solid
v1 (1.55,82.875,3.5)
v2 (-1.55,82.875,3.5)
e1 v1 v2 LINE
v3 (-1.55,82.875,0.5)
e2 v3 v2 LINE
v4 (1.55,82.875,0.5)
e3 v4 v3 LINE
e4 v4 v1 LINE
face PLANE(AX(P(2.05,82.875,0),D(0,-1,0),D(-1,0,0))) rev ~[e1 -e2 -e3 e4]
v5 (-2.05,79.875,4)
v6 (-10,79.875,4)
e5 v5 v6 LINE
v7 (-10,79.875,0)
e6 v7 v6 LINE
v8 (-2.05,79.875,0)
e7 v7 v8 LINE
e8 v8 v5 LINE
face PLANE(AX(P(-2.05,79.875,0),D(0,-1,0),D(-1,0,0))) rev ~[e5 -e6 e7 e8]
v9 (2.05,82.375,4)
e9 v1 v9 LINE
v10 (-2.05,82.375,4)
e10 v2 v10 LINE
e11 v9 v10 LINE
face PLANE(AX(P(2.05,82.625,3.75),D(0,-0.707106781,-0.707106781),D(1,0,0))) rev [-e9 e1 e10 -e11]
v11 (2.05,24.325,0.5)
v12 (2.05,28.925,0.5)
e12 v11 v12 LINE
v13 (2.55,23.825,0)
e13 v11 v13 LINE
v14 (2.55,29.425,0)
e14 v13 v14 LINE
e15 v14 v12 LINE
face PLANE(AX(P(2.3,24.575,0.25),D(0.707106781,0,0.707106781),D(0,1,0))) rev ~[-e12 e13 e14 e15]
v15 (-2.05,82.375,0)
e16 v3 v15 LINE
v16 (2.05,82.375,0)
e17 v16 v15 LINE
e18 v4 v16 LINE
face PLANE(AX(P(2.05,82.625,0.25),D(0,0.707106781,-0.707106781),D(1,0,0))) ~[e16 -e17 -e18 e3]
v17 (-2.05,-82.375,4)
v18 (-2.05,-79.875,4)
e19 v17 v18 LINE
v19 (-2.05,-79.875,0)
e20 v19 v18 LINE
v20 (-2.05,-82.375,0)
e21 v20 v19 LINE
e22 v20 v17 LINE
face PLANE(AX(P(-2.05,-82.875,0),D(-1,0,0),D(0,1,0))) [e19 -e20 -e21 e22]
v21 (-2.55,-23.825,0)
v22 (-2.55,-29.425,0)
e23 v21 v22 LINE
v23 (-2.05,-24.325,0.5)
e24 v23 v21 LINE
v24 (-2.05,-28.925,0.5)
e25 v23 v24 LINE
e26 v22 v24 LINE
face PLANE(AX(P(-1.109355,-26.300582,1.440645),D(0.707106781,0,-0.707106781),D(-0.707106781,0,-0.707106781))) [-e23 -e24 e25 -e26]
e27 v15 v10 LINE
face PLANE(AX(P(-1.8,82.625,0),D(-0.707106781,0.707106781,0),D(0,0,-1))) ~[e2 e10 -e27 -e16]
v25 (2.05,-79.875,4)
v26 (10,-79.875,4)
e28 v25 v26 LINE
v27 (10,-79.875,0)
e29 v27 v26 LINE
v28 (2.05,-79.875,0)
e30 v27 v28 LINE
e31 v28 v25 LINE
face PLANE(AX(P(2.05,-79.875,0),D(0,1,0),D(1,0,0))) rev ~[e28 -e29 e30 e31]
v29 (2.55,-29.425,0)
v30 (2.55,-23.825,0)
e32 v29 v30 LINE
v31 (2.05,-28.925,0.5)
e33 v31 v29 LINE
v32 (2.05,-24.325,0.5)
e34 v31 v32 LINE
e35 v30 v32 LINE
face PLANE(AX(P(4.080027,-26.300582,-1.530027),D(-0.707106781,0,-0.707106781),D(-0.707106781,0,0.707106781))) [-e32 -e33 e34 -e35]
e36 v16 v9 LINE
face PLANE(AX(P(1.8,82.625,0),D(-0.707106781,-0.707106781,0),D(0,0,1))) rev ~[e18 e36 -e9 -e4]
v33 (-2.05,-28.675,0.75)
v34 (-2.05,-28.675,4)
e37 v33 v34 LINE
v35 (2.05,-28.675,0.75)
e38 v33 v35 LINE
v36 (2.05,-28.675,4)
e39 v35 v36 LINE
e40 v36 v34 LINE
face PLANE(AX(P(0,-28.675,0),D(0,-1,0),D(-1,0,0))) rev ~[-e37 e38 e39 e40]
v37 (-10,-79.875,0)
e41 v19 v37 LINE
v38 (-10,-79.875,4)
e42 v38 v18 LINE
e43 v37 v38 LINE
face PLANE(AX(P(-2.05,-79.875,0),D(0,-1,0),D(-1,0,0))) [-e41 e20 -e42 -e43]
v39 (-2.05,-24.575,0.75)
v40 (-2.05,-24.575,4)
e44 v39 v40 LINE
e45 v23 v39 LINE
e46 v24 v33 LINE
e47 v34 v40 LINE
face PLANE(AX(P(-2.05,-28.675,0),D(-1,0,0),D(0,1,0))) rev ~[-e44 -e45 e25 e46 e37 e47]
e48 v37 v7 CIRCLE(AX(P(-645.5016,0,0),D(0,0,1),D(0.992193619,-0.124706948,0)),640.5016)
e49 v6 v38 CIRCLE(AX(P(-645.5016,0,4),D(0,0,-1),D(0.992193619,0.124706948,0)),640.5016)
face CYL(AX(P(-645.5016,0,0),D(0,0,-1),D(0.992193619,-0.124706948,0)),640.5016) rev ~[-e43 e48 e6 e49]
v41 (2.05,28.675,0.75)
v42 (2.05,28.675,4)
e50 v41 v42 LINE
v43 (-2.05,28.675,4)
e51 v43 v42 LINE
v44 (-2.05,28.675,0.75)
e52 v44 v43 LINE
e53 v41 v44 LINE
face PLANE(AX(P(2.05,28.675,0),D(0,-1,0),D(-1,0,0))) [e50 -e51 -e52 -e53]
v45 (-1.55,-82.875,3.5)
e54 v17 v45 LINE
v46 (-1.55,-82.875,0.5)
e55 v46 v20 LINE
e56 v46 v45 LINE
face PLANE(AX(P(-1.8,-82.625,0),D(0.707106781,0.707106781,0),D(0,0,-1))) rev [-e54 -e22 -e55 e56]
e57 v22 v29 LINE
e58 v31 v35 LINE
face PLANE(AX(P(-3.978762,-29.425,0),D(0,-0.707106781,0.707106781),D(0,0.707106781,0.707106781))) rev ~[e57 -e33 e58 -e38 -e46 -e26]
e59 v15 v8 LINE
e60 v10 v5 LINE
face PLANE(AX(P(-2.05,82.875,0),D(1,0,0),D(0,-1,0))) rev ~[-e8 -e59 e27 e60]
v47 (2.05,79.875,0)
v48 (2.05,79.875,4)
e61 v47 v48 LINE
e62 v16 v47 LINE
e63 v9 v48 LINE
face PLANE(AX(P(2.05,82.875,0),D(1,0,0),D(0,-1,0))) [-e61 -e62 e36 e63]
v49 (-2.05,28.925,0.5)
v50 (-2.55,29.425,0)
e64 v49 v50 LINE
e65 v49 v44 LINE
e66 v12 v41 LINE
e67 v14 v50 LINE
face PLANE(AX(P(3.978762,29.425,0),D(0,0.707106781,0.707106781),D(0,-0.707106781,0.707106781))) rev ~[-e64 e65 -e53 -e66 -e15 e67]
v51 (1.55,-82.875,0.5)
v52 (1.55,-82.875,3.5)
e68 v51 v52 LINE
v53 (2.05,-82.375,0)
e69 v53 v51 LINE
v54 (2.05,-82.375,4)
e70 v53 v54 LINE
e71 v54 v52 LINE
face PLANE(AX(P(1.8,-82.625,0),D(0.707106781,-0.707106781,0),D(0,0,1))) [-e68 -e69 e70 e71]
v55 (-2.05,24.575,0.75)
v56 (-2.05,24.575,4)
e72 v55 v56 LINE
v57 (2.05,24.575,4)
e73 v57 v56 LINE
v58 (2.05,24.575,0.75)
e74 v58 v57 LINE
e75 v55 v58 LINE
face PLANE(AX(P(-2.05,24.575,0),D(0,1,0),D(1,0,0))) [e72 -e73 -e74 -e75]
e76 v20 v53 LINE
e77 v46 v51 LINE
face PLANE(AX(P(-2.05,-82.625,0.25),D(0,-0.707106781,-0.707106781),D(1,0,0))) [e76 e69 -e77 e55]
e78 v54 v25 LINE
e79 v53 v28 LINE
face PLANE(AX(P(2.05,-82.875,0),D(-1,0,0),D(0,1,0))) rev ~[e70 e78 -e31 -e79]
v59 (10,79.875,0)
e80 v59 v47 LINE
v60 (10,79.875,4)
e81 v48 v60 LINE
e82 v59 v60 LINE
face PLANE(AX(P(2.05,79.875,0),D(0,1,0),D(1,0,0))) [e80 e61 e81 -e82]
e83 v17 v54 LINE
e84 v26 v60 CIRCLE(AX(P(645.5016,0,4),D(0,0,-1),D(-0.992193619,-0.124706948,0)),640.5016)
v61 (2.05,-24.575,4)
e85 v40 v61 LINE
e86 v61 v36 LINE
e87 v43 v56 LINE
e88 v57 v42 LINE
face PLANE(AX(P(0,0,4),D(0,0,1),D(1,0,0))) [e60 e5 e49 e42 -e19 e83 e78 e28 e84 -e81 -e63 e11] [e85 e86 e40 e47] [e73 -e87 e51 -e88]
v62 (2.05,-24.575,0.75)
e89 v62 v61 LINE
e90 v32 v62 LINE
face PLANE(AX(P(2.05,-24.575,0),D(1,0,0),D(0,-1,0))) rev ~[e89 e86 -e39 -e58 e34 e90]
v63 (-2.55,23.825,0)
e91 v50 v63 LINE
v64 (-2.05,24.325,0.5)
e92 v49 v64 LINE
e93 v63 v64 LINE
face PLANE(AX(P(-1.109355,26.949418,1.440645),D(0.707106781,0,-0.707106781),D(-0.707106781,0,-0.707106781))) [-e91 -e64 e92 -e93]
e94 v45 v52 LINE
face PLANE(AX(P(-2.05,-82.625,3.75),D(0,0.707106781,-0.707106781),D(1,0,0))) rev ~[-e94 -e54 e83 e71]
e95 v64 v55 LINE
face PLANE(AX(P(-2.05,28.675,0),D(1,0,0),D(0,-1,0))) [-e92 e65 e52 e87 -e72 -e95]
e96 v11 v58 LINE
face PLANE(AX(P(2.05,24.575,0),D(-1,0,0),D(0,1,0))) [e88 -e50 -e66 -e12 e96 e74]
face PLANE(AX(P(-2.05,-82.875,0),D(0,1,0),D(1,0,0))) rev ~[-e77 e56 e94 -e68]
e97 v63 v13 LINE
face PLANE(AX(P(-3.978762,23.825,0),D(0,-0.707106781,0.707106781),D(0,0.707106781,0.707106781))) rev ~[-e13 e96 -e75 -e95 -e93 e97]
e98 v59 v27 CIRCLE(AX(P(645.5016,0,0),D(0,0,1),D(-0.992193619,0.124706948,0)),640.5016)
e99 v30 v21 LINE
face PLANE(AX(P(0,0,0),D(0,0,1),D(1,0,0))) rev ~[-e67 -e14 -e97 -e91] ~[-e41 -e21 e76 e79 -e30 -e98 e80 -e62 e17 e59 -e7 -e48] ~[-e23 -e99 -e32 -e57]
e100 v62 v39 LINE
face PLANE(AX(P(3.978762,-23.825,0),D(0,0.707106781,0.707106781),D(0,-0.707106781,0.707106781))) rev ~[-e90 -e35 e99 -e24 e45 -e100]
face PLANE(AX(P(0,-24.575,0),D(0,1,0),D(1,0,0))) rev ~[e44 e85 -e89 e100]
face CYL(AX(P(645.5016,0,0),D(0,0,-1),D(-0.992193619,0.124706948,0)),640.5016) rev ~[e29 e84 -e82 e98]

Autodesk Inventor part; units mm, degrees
ref_plane "YZ Plane" through (0, 0, 0) normal (1, 0, 0) x (0, 1, 0)
ref_plane "XZ Plane" through (0, 0, 0) normal (0, 1, 0) x (-1, 0, 0)
ref_plane "XY Plane" through (0, 0, 0) normal (0, 0, 1) x (1, 0, 0)
sketch "Sketch1" plane through (0, 0, 0) normal (0, 0, 1) x (1, 0, 0)
  line L0 (5, 82.875) -> (-5, 82.875)
  line L1 (-5, 82.875) -> (-5, -82.875)
  line L2 (-5, -82.875) -> (5, -82.875)
  line L3 (5, -82.875) -> (5, 82.875)
  line L4 (-2.05, 24.575) -> (2.05, 24.575)
  line L5 (2.05, 24.575) -> (2.05, 28.675)
  line L6 (2.05, 28.675) -> (-2.05, 28.675)
  line L7 (-2.05, 28.675) -> (-2.05, 24.575)
  line L8 (-2.05, -24.575) -> (2.05, -24.575)
  line L9 (2.05, -24.575) -> (2.05, -28.675)
  line L10 (2.05, -28.675) -> (-2.05, -28.675)
  line L11 (-2.05, -28.675) -> (-2.05, -24.575)
  line L12 (0, -28.675) -> (0, 28.675)
  line L13 (-5, 0) -> (0, 0)
  line L14 (-2.05, 82.875) -> (-2.05, 79.875)
  line L15 (-2.05, 79.875) -> (-5, 79.875)
  line L16 (2.05, 82.875) -> (2.05, 79.875)
  line L17 (2.05, 79.875) -> (5, 79.875)
  line L18 (-2.05, -82.875) -> (-2.05, -79.875)
  line L19 (-2.05, -79.875) -> (-5, -79.875)
  line L20 (2.05, -82.875) -> (2.05, -79.875)
  line L21 (2.05, -79.875) -> (5, -79.875)
  line L22 (5, -79.875) -> (10, -79.875)
  line L23 (-5, -79.875) -> (-10, -79.875)
  line L24 (5, 79.875) -> (10, 79.875)
  line L25 (-5, 79.875) -> (-10, 79.875)
  arc A0 (10, 79.875) -> (10, -79.875) centre (645.5016, 0) ccw
  arc A1 (-10, -79.875) -> (-10, 79.875) centre (-645.5016, 0) ccw
  point P0 (5, 0)
  dimension "d0" = 10
  dimension "d1" = 165.75
  dimension "d4" = 4.1
  dimension "d5" = 4.1
  dimension "d6" = 49.15
  dimension "d7" = 4.1
  dimension "d8" = 4.1
  dimension "d9" = 5
  dimension "d10" = 3
  dimension "d11" = 3
  dimension "d18" = 5
  dimension "d19" = 5
  dimension "d20" = 5
  dimension "d21" = 5
extrude "Extrusion1" add sketch "Sketch1" along normal blind 4 contours L16 L17 L3 L21 L20 L2 L18 L19 L1 L15 L14 L0 | L24 A0 L3 | A0 L22 L3 | L1 A1 L25 | L1 L23 A1
chamfer "Chamfer1" distance 0.5 angle 45 12 edges at (0, 82.875, 4) (-2.05, 82.875, 2) (0, 82.875, 0) (2.05, 82.875, 2) (2.05, -82.875, 2) (0, -82.875, 4) (-2.05, -82.875, 2) (0, -82.875, 0) (2.05, 26.625, 0) (-2.05, 26.625, 0) (2.05, -26.625, 0) (-2.05, -26.625, 0)
chamfer "Chamfer2" distance 0.75 angle 45 4 edges at (0, 28.675, 0) (0, 24.575, 0) (0, -24.575, 0) (0, -28.675, 0)
equation "\"d5\" = d4"
equation "\"d7\" = d4"
equation "\"d8\" = d4"
equation "\"d9\" = 0.5 * d0"
equation "\"d19\" = d18"
equation "\"d20\" = d18"
equation "\"d21\" = d18"
properties part number "BareCalibrationClipSide"
